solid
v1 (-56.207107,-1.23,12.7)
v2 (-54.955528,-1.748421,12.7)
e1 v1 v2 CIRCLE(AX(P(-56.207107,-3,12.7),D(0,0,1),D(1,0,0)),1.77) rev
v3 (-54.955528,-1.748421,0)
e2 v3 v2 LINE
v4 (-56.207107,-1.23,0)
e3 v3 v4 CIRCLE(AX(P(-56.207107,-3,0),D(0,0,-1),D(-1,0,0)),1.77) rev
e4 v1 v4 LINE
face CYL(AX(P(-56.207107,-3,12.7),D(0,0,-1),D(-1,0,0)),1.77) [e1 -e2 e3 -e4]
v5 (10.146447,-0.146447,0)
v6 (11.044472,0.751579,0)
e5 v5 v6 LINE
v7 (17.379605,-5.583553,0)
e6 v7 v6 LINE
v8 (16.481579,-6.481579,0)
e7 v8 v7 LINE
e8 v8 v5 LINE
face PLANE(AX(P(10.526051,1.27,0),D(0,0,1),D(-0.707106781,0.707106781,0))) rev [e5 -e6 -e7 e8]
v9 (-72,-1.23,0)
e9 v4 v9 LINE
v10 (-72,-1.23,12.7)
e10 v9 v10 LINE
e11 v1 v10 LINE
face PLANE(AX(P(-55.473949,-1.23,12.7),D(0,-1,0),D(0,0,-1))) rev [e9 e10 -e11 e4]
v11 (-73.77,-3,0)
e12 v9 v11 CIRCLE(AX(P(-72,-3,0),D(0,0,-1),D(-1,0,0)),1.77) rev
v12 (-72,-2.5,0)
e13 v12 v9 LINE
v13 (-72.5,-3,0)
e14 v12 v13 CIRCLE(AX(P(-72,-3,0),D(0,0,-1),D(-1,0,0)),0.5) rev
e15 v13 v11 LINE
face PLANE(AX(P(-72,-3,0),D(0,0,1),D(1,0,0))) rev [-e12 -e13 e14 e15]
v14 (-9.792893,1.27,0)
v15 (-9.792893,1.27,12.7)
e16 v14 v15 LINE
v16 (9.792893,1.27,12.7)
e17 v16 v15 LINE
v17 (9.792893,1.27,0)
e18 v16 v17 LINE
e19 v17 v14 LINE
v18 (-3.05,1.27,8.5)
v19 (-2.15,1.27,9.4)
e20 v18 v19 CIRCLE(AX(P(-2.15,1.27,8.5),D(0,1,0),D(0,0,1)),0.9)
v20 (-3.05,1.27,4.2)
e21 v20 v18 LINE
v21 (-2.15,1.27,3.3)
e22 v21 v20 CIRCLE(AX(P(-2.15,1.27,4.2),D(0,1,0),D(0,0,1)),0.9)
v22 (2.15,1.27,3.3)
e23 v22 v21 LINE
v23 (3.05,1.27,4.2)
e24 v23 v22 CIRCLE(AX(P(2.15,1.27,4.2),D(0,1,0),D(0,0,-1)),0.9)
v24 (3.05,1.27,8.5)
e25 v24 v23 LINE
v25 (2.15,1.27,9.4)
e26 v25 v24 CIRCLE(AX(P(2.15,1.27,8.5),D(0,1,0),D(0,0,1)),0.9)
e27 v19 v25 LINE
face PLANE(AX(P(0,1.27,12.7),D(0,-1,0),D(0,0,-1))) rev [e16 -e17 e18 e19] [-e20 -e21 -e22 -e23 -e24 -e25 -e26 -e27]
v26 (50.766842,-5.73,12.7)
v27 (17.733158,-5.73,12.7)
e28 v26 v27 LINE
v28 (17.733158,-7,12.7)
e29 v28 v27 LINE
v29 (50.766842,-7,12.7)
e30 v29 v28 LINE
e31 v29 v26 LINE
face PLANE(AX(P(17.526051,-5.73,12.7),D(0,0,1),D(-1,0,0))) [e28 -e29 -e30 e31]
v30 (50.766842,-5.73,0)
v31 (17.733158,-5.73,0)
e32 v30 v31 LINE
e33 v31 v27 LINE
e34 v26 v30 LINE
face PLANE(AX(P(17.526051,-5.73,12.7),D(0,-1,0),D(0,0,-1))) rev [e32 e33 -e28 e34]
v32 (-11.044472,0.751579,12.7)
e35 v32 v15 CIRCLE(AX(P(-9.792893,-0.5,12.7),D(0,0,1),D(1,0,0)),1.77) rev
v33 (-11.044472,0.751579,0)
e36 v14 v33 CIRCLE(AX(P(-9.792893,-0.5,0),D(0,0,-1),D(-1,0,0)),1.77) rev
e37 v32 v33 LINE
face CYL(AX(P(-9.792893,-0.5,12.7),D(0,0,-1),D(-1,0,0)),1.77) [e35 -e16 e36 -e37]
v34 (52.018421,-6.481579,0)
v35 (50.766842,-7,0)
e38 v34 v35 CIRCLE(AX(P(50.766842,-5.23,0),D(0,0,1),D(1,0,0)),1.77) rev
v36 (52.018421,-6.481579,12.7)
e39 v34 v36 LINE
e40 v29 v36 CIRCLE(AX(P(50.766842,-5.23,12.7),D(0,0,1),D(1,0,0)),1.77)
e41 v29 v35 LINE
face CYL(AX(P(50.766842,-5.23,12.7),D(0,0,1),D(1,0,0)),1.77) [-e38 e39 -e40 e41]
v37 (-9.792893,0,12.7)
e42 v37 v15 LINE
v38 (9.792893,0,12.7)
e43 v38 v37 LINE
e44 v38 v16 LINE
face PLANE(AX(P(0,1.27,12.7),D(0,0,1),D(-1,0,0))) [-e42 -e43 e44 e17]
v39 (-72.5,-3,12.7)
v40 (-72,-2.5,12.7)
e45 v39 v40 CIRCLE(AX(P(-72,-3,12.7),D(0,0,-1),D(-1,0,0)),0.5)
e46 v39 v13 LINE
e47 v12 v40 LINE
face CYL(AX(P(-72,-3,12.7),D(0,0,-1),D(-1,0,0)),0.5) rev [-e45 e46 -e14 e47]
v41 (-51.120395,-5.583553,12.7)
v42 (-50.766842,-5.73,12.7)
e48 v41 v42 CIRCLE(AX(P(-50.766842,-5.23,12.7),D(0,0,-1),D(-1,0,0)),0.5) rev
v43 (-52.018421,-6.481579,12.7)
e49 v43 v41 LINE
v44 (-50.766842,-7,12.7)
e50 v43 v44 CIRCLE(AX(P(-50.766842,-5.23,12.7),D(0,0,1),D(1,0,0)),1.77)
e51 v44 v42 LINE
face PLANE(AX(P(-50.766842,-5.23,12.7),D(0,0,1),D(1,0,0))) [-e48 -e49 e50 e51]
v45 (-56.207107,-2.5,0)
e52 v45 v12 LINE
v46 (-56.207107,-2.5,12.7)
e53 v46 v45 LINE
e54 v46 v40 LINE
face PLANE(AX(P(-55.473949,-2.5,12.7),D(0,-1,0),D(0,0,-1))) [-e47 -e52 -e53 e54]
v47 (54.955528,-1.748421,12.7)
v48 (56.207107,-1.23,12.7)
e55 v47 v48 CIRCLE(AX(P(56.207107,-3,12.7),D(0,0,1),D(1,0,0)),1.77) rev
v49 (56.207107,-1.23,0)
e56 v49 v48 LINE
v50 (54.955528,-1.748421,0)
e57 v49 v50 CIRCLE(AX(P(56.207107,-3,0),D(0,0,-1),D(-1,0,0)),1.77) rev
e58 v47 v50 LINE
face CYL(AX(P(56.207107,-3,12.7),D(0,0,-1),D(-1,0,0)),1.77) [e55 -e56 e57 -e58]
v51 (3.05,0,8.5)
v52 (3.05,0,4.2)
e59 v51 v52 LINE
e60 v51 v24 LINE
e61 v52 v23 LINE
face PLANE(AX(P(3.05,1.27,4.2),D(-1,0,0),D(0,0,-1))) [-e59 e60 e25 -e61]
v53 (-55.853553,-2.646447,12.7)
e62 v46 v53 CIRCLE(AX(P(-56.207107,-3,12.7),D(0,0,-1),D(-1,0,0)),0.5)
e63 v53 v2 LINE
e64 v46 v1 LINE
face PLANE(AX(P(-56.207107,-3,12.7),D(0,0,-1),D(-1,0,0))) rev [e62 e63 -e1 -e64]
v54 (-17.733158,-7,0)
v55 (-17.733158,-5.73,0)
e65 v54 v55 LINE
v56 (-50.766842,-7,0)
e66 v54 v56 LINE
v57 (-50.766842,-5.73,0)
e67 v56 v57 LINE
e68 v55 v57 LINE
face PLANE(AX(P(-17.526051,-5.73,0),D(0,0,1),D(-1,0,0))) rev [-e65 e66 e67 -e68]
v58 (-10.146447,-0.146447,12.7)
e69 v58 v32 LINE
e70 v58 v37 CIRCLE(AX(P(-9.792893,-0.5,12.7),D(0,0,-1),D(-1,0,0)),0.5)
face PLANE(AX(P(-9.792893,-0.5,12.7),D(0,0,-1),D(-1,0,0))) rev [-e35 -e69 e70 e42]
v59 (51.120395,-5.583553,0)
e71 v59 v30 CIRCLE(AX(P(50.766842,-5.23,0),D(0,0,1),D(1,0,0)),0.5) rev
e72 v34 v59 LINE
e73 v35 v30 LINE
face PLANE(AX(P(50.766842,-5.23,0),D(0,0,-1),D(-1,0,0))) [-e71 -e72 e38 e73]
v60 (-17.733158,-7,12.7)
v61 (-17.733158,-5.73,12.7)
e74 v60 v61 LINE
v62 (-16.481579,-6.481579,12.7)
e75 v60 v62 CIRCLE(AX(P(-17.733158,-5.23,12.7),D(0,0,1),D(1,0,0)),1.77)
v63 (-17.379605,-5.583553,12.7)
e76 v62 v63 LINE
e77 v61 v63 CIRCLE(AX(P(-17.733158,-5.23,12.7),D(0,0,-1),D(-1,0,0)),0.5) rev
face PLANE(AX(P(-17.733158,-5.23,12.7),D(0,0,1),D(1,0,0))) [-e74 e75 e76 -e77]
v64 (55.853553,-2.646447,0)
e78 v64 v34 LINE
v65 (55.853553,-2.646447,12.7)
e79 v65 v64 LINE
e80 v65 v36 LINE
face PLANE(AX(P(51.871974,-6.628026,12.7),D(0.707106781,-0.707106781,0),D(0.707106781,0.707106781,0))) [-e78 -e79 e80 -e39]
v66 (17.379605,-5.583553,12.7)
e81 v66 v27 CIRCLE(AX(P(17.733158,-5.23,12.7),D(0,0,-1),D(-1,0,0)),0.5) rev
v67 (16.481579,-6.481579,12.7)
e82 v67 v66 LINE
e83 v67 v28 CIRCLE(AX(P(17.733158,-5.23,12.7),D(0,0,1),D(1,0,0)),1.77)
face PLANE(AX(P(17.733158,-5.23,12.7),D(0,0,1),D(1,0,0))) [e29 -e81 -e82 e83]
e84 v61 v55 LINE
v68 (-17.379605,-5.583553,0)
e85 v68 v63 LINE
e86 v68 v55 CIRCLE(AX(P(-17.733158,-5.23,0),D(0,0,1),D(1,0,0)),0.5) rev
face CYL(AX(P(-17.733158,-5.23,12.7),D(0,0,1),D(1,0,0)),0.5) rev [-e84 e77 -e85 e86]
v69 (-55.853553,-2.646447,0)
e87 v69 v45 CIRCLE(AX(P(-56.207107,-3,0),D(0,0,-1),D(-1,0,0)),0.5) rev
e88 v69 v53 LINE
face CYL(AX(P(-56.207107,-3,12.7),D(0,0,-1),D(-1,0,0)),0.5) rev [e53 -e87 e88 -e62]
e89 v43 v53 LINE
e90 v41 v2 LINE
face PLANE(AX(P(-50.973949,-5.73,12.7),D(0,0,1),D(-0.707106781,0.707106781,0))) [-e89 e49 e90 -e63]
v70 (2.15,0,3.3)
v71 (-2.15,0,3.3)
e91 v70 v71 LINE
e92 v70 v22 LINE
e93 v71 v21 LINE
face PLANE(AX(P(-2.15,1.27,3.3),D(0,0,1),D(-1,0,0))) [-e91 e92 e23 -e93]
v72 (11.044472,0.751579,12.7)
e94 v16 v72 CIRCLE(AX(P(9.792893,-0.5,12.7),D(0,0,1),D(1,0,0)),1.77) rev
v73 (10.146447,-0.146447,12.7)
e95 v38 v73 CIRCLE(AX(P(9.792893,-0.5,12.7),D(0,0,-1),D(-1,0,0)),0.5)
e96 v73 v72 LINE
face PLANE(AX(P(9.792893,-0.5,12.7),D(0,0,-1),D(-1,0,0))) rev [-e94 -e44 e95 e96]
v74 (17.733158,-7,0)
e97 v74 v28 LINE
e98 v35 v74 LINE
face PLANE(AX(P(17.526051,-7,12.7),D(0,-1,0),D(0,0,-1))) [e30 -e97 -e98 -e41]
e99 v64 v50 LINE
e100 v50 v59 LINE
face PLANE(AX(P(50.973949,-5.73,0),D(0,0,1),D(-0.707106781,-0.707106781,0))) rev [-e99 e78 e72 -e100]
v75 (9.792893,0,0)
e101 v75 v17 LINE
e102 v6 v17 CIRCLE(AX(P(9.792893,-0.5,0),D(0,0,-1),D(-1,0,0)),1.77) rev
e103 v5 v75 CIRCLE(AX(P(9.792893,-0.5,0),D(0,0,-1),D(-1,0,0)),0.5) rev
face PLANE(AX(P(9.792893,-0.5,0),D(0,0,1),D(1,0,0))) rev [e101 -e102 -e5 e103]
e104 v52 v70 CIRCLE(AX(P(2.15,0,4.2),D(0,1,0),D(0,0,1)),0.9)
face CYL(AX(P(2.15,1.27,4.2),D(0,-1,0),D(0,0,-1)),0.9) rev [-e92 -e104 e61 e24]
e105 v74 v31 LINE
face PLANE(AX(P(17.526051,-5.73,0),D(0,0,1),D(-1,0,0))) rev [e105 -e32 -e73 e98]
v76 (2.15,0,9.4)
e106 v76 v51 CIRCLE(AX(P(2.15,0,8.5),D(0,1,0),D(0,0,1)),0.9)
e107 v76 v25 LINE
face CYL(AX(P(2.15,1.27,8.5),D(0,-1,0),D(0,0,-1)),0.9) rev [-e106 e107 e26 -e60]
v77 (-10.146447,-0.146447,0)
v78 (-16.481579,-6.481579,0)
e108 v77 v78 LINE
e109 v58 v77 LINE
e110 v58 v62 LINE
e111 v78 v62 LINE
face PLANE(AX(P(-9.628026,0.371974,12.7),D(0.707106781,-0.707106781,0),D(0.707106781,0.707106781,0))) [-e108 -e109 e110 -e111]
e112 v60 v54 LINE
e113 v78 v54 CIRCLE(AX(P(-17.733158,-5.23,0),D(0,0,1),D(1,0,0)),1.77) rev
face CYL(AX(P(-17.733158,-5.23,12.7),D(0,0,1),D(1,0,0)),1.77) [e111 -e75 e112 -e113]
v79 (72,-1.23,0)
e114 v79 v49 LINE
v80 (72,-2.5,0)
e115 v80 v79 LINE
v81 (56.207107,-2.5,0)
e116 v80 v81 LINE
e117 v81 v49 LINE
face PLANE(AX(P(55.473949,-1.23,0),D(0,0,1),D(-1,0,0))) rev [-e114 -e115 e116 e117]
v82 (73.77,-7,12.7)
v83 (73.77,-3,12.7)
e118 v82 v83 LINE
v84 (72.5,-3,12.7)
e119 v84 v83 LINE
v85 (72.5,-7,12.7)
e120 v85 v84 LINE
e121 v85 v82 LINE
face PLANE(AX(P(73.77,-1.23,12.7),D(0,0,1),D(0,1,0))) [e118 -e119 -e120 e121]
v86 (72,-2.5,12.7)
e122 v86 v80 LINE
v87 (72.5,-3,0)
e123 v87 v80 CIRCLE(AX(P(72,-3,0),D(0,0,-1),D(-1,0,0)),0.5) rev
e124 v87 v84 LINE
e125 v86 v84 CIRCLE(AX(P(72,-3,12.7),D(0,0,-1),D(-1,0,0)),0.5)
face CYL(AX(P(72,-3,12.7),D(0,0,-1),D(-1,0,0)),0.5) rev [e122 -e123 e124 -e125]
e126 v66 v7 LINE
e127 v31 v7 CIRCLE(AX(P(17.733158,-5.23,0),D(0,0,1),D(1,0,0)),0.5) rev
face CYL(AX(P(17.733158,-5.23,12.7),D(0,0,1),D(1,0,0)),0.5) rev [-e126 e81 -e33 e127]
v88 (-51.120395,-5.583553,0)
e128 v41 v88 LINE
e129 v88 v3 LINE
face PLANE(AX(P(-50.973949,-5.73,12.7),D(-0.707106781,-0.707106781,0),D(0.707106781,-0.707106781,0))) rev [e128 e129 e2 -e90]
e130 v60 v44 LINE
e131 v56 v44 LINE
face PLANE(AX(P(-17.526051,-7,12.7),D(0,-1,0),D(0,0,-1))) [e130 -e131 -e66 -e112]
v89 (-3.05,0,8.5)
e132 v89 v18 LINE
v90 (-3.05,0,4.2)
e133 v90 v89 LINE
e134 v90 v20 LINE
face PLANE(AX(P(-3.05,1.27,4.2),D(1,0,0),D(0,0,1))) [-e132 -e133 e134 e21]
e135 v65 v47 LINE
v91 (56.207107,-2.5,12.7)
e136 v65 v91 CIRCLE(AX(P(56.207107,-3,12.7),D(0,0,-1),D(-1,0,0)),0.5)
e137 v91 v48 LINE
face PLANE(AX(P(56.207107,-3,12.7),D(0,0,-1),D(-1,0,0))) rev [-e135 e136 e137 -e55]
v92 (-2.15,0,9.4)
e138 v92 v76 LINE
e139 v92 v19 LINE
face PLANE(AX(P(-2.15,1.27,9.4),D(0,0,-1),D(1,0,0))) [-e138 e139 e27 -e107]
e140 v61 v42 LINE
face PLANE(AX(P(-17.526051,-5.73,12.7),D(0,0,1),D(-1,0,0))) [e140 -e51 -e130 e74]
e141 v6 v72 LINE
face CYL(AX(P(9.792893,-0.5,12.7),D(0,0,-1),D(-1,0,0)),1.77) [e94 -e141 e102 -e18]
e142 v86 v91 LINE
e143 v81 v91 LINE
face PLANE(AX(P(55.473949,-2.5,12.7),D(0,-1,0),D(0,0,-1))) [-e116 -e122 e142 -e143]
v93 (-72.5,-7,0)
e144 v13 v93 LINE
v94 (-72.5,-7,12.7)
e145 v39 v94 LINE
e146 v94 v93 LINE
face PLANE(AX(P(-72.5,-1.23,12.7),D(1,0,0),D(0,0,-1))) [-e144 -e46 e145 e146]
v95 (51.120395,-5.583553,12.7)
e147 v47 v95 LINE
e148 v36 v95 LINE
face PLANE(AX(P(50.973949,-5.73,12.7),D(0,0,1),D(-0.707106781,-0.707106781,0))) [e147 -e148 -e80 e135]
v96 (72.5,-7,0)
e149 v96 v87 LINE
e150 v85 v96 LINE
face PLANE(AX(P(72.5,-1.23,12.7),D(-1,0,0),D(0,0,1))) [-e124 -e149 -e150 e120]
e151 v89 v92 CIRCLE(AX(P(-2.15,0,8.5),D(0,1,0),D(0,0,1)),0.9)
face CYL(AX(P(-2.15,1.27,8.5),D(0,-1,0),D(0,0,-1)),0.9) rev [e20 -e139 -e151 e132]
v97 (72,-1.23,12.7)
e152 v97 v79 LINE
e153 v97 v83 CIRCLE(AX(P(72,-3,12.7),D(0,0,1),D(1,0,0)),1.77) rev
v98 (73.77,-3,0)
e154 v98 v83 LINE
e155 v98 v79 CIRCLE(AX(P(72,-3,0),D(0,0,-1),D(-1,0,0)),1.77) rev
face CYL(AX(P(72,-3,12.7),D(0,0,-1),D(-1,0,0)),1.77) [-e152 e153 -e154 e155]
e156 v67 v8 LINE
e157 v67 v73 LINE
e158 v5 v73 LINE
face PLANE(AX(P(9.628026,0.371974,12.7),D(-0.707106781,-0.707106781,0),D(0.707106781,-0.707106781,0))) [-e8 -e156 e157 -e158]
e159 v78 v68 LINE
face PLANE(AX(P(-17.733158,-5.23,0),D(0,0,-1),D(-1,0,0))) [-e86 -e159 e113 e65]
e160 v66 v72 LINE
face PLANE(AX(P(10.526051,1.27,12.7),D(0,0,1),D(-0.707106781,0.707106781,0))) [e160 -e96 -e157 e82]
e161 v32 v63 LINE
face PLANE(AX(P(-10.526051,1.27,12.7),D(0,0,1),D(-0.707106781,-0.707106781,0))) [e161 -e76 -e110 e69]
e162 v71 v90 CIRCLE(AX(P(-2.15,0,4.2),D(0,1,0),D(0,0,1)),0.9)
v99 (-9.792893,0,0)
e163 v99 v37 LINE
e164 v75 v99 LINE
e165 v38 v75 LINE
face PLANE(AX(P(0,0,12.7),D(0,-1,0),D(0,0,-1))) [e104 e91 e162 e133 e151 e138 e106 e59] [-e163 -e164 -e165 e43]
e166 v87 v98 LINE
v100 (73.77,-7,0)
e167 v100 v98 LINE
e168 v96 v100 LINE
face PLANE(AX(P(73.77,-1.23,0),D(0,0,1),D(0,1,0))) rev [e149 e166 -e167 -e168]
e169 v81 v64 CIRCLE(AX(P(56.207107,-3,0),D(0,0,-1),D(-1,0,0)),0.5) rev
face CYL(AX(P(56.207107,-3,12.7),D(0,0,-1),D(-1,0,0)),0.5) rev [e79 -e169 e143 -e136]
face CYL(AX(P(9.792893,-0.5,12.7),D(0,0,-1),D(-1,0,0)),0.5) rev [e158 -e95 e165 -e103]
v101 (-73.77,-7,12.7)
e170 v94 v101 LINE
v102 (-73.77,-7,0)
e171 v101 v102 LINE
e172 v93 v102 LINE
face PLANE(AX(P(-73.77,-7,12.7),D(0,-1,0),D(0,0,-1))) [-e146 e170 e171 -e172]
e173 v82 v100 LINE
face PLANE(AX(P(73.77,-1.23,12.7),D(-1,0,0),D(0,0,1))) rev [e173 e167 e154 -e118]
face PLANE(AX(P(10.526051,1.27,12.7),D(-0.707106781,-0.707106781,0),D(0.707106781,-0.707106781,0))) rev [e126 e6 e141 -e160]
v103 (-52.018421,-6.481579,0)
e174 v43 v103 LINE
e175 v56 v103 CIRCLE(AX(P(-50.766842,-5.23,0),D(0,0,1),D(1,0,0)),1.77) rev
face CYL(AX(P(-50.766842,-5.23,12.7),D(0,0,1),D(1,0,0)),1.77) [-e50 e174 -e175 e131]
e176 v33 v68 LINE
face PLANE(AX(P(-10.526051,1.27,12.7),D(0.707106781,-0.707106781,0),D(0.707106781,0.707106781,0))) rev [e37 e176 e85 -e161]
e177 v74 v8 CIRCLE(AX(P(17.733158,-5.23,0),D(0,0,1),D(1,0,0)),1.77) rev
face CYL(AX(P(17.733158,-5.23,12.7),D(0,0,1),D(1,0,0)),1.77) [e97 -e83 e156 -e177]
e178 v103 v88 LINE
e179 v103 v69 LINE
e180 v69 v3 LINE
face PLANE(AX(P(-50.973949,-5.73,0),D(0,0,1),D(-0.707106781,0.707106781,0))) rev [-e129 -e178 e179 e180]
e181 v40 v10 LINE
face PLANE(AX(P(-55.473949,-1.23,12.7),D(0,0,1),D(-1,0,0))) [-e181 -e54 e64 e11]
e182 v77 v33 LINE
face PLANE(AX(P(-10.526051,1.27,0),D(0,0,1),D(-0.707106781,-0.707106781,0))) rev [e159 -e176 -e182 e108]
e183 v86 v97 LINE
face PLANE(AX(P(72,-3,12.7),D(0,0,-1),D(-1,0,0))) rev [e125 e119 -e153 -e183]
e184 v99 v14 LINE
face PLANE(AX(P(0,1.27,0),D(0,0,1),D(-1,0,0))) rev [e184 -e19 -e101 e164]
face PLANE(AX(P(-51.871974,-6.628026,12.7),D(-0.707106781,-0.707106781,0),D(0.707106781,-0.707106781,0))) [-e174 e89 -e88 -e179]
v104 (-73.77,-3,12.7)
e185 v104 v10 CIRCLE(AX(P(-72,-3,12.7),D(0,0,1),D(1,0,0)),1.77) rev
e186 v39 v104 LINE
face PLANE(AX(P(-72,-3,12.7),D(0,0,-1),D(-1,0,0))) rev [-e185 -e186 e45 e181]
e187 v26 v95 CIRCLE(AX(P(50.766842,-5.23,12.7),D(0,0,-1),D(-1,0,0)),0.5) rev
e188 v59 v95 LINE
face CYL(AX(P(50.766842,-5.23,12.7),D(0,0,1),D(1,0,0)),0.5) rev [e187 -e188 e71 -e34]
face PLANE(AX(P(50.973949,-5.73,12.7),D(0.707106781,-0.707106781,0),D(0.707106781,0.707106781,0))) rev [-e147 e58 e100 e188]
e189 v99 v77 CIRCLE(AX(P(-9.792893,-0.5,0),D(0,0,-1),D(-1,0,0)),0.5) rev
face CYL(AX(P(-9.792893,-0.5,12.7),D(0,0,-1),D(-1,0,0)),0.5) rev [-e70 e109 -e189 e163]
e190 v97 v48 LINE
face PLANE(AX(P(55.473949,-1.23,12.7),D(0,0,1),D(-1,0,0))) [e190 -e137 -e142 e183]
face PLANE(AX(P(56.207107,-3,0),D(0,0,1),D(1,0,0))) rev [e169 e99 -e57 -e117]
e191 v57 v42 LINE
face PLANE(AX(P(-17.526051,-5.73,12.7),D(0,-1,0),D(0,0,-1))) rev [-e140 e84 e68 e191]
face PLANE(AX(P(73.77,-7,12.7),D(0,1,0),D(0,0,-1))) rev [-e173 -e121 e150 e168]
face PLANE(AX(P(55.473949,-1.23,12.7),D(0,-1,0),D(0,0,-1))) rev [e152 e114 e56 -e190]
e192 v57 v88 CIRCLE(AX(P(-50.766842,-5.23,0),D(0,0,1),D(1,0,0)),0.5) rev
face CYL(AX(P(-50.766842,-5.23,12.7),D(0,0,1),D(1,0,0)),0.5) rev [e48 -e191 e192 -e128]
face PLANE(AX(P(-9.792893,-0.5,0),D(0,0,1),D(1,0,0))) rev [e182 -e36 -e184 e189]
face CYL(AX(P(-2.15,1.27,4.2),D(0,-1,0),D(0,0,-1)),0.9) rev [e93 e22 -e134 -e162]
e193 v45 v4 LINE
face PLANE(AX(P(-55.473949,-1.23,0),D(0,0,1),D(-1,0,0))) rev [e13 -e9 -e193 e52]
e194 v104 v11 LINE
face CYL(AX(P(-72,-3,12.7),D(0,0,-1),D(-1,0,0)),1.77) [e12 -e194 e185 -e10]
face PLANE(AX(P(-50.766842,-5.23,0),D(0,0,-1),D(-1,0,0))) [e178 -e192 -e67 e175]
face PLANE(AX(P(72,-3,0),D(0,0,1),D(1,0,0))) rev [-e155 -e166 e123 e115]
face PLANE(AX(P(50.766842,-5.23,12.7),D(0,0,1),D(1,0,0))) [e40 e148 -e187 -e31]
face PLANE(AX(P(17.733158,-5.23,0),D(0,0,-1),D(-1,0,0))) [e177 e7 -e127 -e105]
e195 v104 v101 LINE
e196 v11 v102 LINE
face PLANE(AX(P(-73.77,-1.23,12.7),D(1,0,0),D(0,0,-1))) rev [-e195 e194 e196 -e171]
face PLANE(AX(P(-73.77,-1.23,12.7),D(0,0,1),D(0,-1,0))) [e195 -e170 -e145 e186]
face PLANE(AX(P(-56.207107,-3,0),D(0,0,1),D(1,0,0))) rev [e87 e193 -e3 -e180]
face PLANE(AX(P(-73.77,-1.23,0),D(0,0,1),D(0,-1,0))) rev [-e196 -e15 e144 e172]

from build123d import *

# Parameters (mm, degrees)
BOSS_EXTRUDE1_DEPTH    = 12.7
CUT_EXTRUDE1_DEPTH     = 12.7
CONVERT_SOLID1_DEPTH   = 12.7
CONVERT_SOLID1_2_DEPTH = 12.7


# Read off the part's stored shape, not the designer's step: Convert-Solid1
with BuildPart() as part:
    # Sketch1 → Boss-Extrude1 (new body)
    with BuildSketch(Plane.XY):
        Polygon((0, 0), (10, 0), (17, -7), (51.5, -7), (56, -2.5), (72.5, -2.5), (72.5, -7), (73.77, -7), (73.77, -1.23), (55.473948776, -1.23), (50.973948776, -5.73), (17.526051224, -5.73), (10.526051224, 1.27), (0, 1.27), (-10.526051224, 1.27), (-17.526051224, -5.73), (-50.973948776, -5.73), (-55.473948776, -1.23), (-73.77, -1.23), (-73.77, -7), (-72.5, -7), (-72.5, -2.5), (-56, -2.5), (-51.5, -7), (-17, -7), (-10, 0), align=None)
    extrude(amount=BOSS_EXTRUDE1_DEPTH)

    # Sketch2 → Cut-Extrude1 (cut)
    with BuildSketch(Plane(origin=(0, 1.27, 0), x_dir=(1, 0, 0), z_dir=(0, 1, 0))):
        with BuildLine():
            Line((-2.15, -3.3), (2.15, -3.3))
            ThreePointArc((2.15, -3.3), (2.786396103, -3.563603897), (3.05, -4.2))
            Line((3.05, -4.2), (3.05, -8.5))
            ThreePointArc((3.05, -8.5), (2.786396103, -9.136396103), (2.15, -9.4))
            Line((2.15, -9.4), (-2.15, -9.4))
            ThreePointArc((-2.15, -9.4), (-2.786396103, -9.136396103), (-3.05, -8.5))
            Line((-3.05, -8.5), (-3.05, -4.2))
            ThreePointArc((-3.05, -4.2), (-2.786396103, -3.563603897), (-2.15, -3.3))
        make_face()
    extrude(amount=-CUT_EXTRUDE1_DEPTH, mode=Mode.SUBTRACT)

    # Convert-Solid1 outline → Convert-Solid1 (cut)
    with BuildSketch(Plane.XY):
        with BuildLine():
            Line((73.77, -1.23), (72, -1.23))
            ThreePointArc((72, -1.23), (73.251579003, -1.748420997), (73.77, -3))
            Line((73.77, -3), (73.77, -1.23))
        make_face()
        with BuildLine():
            ThreePointArc((54.955527778, -1.748420997), (55.529757106, -1.364733227), (56.207106781, -1.23))
            Line((56.207106781, -1.23), (55.473948776, -1.23))
            Line((55.473948776, -1.23), (54.955527778, -1.748420997))
        make_face()
        with BuildLine():
            ThreePointArc((9.792893219, 1.27), (10.470242894, 1.135266773), (11.044472222, 0.751579003))
            Line((11.044472222, 0.751579003), (10.526051224, 1.27))
            Line((10.526051224, 1.27), (9.792893219, 1.27))
        make_face()
        with BuildLine():
            Line((51.5, -7), (52.018420997, -6.481579003))
            ThreePointArc((52.018420997, -6.481579003), (51.44419167, -6.865266773), (50.766841995, -7))
            Line((50.766841995, -7), (51.5, -7))
        make_face()
        with BuildLine():
            ThreePointArc((-11.044472222, 0.751579003), (-10.470242894, 1.135266773), (-9.792893219, 1.27))
            Line((-9.792893219, 1.27), (-10.526051224, 1.27))
            Line((-10.526051224, 1.27), (-11.044472222, 0.751579003))
        make_face()
        with BuildLine():
            Line((17, -7), (17.733158005, -7))
            ThreePointArc((17.733158005, -7), (17.05580833, -6.865266773), (16.481579003, -6.481579003))
            Line((16.481579003, -6.481579003), (17, -7))
        make_face()
        with BuildLine():
            ThreePointArc((-56.207106781, -1.23), (-55.529757106, -1.364733227), (-54.955527778, -1.748420997))
            Line((-54.955527778, -1.748420997), (-55.473948776, -1.23))
            Line((-55.473948776, -1.23), (-56.207106781, -1.23))
        make_face()
        with BuildLine():
            Line((-17, -7), (-16.481579003, -6.481579003))
            ThreePointArc((-16.481579003, -6.481579003), (-17.05580833, -6.865266773), (-17.733158005, -7))
            Line((-17.733158005, -7), (-17, -7))
        make_face()
        with BuildLine():
            ThreePointArc((-73.77, -3), (-73.251579003, -1.748420997), (-72, -1.23))
            Line((-72, -1.23), (-73.77, -1.23))
            Line((-73.77, -1.23), (-73.77, -3))
        make_face()
        with BuildLine():
            Line((-51.5, -7), (-50.766841995, -7))
            ThreePointArc((-50.766841995, -7), (-51.44419167, -6.865266773), (-52.018420997, -6.481579003))
            Line((-52.018420997, -6.481579003), (-51.5, -7))
        make_face()
    extrude(amount=CONVERT_SOLID1_DEPTH, mode=Mode.SUBTRACT)

    # Convert-Solid1 2 outline → Convert-Solid1 2 (add)
    with BuildSketch(Plane.XY):
        with BuildLine():
            Line((50.973948776, -5.73), (51.120395385, -5.583553391))
            ThreePointArc((51.120395385, -5.583553391), (50.958183711, -5.691939766), (50.766841995, -5.73))
            Line((50.766841995, -5.73), (50.973948776, -5.73))
        make_face()
        with BuildLine():
            ThreePointArc((72, -2.5), (72.353553391, -2.646446609), (72.5, -3))
            Line((72.5, -3), (72.5, -2.5))
            Line((72.5, -2.5), (72, -2.5))
        make_face()
        with BuildLine():
            Line((17.526051224, -5.73), (17.733158005, -5.73))
            ThreePointArc((17.733158005, -5.73), (17.541816289, -5.691939766), (17.379604615, -5.583553391))
            Line((17.379604615, -5.583553391), (17.526051224, -5.73))
        make_face()
        with BuildLine():
            ThreePointArc((55.853553391, -2.646446609), (56.015765065, -2.538060234), (56.207106781, -2.5))
            Line((56.207106781, -2.5), (56, -2.5))
            Line((56, -2.5), (55.853553391, -2.646446609))
        make_face()
        with BuildLine():
            Line((-17.526051224, -5.73), (-17.379604615, -5.583553391))
            ThreePointArc((-17.379604615, -5.583553391), (-17.541816289, -5.691939766), (-17.733158005, -5.73))
            Line((-17.733158005, -5.73), (-17.526051224, -5.73))
        make_face()
        with BuildLine():
            ThreePointArc((9.792893219, 0), (9.984234935, -0.038060234), (10.146446609, -0.146446609))
            Line((10.146446609, -0.146446609), (10, 0))
            Line((10, 0), (9.792893219, 0))
        make_face()
        with BuildLine():
            Line((-50.973948776, -5.73), (-50.766841995, -5.73))
            ThreePointArc((-50.766841995, -5.73), (-50.958183711, -5.691939766), (-51.120395385, -5.583553391))
            Line((-51.120395385, -5.583553391), (-50.973948776, -5.73))
        make_face()
        with BuildLine():
            ThreePointArc((-10.146446609, -0.146446609), (-9.984234935, -0.038060234), (-9.792893219, 0))
            Line((-9.792893219, 0), (-10, 0))
            Line((-10, 0), (-10.146446609, -0.146446609))
        make_face()
        with BuildLine():
            ThreePointArc((-56.207106781, -2.5), (-56.015765065, -2.538060234), (-55.853553391, -2.646446609))
            Line((-55.853553391, -2.646446609), (-56, -2.5))
            Line((-56, -2.5), (-56.207106781, -2.5))
        make_face()
        with BuildLine():
            Line((-72.5, -2.5), (-72.5, -3))
            ThreePointArc((-72.5, -3), (-72.353553391, -2.646446609), (-72, -2.5))
            Line((-72, -2.5), (-72.5, -2.5))
        make_face()
    extrude(amount=CONVERT_SOLID1_2_DEPTH)


solid = part.part
